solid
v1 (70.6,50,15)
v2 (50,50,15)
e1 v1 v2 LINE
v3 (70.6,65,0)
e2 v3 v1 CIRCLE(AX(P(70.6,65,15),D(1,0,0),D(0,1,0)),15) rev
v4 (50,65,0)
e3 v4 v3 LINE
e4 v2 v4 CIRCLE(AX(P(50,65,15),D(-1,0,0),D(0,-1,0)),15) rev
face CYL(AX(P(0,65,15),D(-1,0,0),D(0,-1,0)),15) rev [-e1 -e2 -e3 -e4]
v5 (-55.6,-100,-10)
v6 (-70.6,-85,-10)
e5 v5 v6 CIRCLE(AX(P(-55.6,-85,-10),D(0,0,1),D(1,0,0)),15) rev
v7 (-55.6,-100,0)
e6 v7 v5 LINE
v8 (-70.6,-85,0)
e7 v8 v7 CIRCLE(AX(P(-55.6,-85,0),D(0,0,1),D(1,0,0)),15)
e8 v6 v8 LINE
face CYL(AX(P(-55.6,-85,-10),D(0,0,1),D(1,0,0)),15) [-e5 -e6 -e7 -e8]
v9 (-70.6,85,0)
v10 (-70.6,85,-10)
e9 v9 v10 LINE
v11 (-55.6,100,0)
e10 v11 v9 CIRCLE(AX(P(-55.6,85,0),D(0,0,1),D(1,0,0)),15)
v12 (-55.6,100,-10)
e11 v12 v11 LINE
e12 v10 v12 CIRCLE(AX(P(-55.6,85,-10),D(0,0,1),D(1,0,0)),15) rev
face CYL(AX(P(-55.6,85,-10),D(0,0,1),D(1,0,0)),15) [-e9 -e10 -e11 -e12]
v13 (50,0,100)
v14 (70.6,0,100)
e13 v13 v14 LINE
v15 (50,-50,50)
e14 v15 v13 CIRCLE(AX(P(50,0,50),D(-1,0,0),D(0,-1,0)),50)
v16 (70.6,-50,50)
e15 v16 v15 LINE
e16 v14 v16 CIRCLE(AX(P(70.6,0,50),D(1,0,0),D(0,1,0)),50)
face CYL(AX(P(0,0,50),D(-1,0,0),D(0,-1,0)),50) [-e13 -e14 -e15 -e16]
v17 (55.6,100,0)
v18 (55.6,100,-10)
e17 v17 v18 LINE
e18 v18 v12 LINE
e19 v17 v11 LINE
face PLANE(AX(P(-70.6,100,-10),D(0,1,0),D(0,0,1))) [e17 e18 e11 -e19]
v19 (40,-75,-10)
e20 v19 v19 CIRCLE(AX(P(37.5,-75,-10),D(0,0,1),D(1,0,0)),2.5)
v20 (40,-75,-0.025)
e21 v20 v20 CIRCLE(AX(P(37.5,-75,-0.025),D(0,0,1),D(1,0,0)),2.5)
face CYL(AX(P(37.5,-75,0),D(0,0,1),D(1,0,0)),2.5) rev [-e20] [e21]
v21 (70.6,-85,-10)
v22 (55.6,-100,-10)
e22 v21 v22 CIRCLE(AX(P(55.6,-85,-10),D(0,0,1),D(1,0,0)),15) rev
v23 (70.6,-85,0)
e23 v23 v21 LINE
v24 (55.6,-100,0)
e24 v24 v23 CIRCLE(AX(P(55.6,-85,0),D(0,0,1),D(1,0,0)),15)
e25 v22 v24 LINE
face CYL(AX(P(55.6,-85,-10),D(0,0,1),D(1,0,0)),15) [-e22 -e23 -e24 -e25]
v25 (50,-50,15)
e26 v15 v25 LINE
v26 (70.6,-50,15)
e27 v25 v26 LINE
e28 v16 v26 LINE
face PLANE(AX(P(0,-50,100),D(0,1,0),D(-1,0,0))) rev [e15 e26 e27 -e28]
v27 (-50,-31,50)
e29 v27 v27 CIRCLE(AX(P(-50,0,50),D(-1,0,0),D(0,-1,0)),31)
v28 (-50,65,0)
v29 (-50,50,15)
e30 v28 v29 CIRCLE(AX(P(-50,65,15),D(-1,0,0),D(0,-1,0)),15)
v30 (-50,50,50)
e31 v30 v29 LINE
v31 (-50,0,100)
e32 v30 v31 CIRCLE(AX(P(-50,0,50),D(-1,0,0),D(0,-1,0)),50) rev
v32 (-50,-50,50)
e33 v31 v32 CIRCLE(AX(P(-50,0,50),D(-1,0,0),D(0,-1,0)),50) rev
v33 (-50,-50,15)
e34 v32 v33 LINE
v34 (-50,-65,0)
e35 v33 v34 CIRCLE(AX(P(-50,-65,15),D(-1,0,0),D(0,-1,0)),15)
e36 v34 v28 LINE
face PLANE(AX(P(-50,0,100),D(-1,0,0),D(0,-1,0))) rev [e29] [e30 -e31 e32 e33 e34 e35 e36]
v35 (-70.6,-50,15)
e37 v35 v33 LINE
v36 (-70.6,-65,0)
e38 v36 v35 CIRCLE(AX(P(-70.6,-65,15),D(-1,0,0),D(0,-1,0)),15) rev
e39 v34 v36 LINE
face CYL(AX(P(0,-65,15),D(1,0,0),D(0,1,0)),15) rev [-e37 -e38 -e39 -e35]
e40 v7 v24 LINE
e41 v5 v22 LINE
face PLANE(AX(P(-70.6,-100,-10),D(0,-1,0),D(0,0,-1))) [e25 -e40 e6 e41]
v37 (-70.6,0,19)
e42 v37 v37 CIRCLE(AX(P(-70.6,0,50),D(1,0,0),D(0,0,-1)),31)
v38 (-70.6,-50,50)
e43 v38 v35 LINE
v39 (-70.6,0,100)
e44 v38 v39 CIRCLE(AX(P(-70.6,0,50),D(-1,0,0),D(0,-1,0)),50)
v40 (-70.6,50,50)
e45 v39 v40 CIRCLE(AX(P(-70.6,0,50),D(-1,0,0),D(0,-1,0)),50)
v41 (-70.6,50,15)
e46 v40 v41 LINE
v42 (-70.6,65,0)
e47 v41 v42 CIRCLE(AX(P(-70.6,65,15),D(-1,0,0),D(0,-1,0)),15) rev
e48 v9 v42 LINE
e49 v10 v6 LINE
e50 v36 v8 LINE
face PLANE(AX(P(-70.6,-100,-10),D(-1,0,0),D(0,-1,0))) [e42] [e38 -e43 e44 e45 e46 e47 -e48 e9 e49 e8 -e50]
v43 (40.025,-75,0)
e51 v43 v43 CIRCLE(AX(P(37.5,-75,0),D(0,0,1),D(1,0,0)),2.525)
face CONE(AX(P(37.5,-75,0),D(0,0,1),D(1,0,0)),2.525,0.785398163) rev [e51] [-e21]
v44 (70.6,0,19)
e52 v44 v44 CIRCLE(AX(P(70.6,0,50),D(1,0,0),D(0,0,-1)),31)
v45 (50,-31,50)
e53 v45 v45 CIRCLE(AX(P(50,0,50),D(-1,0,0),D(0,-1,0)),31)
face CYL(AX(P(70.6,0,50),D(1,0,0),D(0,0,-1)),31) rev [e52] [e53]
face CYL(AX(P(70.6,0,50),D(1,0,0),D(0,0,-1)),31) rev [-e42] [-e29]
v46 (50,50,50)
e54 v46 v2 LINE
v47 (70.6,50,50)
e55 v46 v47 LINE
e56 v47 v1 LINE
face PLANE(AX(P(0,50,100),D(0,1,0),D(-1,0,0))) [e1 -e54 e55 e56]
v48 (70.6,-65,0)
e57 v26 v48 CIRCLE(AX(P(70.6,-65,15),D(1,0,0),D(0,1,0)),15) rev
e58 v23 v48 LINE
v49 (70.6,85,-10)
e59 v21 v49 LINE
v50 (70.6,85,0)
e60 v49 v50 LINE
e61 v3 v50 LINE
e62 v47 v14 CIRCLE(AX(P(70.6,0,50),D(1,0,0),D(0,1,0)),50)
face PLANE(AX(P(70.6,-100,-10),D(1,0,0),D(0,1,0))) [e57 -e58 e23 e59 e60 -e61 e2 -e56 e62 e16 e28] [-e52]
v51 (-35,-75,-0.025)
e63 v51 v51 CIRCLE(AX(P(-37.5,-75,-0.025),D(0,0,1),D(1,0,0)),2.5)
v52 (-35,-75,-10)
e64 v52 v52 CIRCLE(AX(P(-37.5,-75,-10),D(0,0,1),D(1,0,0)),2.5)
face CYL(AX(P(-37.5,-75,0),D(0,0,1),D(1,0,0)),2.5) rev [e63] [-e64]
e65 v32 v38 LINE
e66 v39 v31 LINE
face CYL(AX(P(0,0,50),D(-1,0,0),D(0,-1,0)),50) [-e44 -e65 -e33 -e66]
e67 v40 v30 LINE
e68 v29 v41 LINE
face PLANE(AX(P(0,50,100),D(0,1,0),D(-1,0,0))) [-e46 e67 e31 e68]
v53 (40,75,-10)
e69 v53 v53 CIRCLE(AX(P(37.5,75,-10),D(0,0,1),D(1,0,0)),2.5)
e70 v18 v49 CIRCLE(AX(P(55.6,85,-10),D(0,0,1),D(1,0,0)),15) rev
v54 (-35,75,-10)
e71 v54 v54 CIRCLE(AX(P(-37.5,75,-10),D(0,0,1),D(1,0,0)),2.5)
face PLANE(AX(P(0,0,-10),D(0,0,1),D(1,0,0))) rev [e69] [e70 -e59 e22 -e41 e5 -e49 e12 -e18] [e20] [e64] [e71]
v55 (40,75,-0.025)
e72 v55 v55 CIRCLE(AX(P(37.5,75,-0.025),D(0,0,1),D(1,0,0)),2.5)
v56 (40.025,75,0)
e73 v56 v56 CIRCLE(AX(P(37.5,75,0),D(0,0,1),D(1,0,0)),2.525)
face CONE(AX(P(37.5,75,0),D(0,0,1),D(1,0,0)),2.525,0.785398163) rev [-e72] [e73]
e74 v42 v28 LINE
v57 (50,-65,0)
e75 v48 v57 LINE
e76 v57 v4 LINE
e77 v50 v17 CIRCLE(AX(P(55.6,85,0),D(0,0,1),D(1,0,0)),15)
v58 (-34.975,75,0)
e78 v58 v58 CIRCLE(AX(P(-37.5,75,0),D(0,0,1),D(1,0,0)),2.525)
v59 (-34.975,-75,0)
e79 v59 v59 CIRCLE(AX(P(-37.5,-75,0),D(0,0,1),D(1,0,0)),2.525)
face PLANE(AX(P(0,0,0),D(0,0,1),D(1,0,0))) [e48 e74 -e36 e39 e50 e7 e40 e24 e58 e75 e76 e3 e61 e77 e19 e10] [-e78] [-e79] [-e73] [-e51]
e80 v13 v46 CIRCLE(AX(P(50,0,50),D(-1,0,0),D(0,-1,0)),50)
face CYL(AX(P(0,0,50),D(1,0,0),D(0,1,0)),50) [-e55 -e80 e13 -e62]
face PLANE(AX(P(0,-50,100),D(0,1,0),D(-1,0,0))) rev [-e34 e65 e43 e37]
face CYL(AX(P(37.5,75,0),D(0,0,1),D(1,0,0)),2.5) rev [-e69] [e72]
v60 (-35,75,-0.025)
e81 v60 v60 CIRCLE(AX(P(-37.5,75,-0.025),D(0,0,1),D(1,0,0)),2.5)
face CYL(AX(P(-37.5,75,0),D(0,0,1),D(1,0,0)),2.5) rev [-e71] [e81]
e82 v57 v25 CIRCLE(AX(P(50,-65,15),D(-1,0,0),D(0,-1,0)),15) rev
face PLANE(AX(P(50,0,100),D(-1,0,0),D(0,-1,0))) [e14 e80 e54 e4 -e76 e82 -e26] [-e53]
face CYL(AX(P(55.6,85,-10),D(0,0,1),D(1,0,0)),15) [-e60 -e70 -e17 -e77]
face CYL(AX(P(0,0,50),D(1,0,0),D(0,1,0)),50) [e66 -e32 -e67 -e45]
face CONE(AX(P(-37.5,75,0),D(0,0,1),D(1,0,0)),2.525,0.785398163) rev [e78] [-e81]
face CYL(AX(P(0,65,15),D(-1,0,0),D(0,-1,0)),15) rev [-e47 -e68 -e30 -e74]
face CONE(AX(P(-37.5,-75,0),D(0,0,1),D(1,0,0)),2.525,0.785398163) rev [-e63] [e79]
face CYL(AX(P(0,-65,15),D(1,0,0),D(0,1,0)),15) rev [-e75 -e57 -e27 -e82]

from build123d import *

# Parameters (mm, degrees)
SKETCH1_W                       = 200
SKETCH1_H                       = 141.2
BOSS_EXTRUDE1_DEPTH             = 10
SKETCH2_W                       = 100
SKETCH2_H                       = 20.6
BOSS_EXTRUDE2_DEPTH             = 100
FILLET1_R                       = 50
F_10_0MM_DOWEL_HOLE1_D          = 62
F_5_0MM_DOWEL_HOLE1_D           = 5
F_5_0MM_DOWEL_HOLE1_CSINK_D     = 5.05
F_5_0MM_DOWEL_HOLE1_CSINK_ANGLE = 90
FILLET2_R                       = 15


with BuildPart() as part:
    # Sketch1 → Boss-Extrude1 (new body)
    with BuildSketch(Plane(origin=(0, 0, 0), x_dir=(0, 1, 0), z_dir=(0, 0, 1))):
        Rectangle(SKETCH1_W, SKETCH1_H)
    extrude(amount=-BOSS_EXTRUDE1_DEPTH)

    # Sketch2 → Boss-Extrude2 (add)
    with BuildSketch(Plane(origin=(0, 0, 0), x_dir=(0, 1, 0), z_dir=(0, 0, 1))):
        with Locations((0, 60.3)):
            Rectangle(SKETCH2_W, SKETCH2_H)
        with Locations((0, -60.3)):
            Rectangle(SKETCH2_W, SKETCH2_H)
    extrude(amount=BOSS_EXTRUDE2_DEPTH)

    # Fillet1
    fillet1_edges = [part.edges().sort_by_distance(p)[0] for p in [
        (60.3, 50, 100),
        (60.3, -50, 100),
        (-60.3, 50, 100),
        (-60.3, -50, 100),
    ]]
    fillet(fillet1_edges, radius=FILLET1_R - 0.0001)  # a hair under: the kernel refuses the full size

    # Ø10.0mm Dowel Hole1 (through all)
    with Locations(Plane.YZ.offset(70.6)):
        with Locations((0, 50)):
            Hole(F_10_0MM_DOWEL_HOLE1_D / 2)

    # Ø5.0mm Dowel Hole1 (through all)
    with Locations(Plane(origin=(0, 0, 0), x_dir=(0, 1, 0), z_dir=(0, 0, 1))):
        with Locations((75, -37.5), (-75, 37.5), (-75, -37.5), (75, 37.5)):
            CounterSinkHole(F_5_0MM_DOWEL_HOLE1_D / 2, F_5_0MM_DOWEL_HOLE1_CSINK_D / 2, counter_sink_angle=F_5_0MM_DOWEL_HOLE1_CSINK_ANGLE)

    # Fillet2
    fillet2_edges = [part.edges().sort_by_distance(p)[0] for p in [
        (-60.3, -50, 0),
        (-60.3, 50, 0),
        (60.3, -50, 0),
        (60.3, 50, 0),
        (-70.6, -100, -5),
        (-70.6, 100, -5),
        (70.6, 100, -5),
        (70.6, -100, -5),
    ]]
    fillet(fillet2_edges, radius=FILLET2_R)


solid = part.part
